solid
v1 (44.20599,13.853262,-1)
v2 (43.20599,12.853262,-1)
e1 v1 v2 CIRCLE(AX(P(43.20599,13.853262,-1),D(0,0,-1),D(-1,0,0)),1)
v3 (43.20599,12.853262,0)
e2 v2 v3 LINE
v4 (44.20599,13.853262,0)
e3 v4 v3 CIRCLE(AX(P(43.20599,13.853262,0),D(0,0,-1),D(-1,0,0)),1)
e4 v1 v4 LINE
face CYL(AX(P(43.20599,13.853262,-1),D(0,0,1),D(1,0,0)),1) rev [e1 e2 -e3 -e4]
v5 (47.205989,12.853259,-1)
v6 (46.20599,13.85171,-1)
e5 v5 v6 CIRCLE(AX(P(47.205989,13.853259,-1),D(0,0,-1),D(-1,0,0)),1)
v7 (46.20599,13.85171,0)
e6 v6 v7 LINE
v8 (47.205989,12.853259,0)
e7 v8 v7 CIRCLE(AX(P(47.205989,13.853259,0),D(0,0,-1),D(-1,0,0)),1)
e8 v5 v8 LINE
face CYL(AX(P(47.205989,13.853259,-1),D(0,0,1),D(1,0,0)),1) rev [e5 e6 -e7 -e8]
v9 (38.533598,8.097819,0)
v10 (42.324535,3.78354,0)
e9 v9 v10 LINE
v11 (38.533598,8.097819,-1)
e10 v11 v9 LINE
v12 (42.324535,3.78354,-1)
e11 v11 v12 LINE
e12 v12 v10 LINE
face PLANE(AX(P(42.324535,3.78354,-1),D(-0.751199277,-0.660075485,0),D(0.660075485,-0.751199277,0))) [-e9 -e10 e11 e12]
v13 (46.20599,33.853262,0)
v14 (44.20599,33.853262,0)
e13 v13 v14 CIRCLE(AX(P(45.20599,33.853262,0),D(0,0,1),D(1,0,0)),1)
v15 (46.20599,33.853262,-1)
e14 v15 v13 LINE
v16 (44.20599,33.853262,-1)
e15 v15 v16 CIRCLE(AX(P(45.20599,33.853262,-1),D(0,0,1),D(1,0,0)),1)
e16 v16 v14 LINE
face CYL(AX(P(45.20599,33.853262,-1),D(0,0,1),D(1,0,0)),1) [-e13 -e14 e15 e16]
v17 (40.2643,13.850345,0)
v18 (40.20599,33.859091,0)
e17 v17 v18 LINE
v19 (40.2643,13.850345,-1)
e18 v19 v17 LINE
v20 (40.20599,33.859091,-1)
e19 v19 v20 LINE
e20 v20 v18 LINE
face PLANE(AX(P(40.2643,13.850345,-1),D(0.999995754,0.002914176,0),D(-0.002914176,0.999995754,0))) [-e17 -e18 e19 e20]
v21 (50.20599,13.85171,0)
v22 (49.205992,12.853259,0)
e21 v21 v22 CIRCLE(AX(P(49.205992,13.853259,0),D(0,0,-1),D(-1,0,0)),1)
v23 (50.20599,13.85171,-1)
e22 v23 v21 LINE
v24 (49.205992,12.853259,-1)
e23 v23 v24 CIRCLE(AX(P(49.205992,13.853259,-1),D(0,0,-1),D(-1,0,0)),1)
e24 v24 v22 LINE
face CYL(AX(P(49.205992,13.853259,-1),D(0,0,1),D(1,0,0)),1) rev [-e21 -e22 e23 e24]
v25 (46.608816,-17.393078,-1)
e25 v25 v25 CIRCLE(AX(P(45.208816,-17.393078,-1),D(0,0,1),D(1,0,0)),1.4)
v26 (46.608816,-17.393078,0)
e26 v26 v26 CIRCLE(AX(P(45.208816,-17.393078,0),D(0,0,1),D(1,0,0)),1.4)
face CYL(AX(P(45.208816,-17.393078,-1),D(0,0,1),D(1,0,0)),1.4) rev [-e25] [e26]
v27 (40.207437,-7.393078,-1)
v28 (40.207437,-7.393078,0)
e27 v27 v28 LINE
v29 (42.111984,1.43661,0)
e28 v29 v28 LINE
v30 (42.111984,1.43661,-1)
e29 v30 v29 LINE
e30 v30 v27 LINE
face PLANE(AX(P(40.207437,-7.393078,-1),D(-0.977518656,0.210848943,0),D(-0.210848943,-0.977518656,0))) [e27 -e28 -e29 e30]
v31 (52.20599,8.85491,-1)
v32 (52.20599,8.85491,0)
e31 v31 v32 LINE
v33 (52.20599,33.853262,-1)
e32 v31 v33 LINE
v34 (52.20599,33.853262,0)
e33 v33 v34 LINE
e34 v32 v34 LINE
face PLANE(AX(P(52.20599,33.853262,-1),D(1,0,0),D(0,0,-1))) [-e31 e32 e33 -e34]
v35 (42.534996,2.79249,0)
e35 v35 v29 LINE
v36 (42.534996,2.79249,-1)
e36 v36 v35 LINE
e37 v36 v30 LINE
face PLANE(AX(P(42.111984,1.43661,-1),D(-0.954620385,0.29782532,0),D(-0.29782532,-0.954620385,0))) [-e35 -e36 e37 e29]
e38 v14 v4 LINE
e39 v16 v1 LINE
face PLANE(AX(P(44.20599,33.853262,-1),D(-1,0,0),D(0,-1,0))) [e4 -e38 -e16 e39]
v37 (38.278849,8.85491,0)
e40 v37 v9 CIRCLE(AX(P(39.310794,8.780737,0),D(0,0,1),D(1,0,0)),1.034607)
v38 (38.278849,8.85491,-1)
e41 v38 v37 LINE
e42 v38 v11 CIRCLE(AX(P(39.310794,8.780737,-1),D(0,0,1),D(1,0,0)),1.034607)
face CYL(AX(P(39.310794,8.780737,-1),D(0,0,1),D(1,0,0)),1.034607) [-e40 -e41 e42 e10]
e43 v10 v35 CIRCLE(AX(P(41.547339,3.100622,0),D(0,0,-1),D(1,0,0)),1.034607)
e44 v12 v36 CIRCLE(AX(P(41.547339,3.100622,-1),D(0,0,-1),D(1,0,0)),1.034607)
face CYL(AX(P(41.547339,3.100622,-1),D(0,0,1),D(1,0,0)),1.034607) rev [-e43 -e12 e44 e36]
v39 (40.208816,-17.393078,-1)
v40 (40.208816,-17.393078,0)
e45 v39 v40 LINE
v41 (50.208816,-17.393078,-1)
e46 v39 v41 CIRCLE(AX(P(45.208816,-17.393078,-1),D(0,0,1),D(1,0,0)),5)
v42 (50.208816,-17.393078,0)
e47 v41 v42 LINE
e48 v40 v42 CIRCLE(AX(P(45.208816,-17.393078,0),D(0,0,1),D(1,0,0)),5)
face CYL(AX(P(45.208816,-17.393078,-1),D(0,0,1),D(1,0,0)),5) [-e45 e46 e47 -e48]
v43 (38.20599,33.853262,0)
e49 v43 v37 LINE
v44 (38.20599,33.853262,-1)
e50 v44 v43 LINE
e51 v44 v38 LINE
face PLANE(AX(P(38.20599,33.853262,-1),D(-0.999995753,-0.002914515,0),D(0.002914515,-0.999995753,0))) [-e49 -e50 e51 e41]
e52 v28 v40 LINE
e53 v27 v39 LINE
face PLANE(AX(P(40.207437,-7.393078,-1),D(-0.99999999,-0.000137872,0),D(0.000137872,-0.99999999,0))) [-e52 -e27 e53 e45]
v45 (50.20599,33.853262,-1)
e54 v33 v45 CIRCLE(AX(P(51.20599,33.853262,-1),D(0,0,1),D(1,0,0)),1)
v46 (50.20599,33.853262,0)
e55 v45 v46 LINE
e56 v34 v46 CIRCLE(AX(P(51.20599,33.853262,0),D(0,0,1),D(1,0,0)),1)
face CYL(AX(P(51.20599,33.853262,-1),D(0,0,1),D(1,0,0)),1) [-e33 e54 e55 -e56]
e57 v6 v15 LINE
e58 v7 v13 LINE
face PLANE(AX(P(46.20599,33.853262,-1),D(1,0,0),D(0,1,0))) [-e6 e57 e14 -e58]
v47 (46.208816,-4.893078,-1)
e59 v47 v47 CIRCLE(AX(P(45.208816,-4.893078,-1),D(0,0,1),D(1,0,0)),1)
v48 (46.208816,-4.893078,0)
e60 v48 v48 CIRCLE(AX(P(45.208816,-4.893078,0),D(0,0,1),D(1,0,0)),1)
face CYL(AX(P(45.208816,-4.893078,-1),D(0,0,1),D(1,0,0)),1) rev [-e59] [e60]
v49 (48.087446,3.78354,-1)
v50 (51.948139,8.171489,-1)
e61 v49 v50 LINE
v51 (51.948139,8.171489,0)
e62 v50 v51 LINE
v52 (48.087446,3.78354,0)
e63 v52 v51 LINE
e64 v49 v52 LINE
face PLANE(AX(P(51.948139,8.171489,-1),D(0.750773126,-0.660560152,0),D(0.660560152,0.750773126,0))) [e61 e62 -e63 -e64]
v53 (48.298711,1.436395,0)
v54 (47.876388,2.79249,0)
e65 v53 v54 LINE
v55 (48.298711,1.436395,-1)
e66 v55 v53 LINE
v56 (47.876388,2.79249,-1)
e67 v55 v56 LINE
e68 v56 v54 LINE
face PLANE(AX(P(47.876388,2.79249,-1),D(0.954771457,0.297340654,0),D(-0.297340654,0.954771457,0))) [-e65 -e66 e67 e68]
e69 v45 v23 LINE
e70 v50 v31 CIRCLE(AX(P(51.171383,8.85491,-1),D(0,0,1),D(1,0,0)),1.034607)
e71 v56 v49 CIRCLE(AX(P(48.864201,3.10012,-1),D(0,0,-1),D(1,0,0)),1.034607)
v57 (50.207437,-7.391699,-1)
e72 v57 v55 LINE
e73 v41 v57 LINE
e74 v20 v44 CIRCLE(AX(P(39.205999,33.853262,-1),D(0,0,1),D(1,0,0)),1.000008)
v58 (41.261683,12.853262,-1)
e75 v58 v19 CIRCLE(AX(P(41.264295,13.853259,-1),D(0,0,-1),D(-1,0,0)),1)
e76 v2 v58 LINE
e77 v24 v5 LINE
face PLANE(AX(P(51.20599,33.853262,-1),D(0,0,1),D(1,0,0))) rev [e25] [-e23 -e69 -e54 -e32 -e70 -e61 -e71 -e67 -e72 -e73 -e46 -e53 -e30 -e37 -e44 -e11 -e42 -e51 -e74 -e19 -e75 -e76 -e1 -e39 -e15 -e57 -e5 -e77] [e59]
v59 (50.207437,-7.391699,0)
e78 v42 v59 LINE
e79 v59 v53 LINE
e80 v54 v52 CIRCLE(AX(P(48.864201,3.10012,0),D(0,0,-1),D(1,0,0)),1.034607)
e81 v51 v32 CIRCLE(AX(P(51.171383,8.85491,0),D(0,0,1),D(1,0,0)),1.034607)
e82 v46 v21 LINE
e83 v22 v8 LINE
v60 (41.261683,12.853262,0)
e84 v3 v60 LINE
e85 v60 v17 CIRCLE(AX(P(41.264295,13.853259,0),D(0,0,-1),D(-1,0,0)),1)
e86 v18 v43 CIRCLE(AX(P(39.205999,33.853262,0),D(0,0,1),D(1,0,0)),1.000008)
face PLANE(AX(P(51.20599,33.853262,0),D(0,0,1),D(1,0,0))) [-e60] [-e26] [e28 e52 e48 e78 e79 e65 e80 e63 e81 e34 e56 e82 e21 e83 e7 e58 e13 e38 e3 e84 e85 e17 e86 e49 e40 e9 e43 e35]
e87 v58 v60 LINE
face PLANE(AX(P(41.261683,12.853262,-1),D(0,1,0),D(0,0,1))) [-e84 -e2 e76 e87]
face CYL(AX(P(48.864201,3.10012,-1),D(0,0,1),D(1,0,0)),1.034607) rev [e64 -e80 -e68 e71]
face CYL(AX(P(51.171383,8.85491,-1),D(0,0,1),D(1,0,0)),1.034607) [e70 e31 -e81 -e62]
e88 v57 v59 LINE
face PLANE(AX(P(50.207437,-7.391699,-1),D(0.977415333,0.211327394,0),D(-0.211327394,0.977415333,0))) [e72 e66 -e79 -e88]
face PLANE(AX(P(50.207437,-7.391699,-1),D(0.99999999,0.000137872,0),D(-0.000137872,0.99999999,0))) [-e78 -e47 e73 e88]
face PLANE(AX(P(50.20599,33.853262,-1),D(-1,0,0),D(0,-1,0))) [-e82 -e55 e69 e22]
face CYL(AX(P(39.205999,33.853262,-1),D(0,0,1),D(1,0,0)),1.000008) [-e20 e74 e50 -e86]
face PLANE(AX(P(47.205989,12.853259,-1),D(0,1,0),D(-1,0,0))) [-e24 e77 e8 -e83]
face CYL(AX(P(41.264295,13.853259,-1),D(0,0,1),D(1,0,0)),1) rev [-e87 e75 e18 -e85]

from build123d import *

# Parameters (mm, degrees)
MODEL_R           = 1.4
MODEL_R_2         = 1
BRIDA_BASE1_DEPTH = 1


# Sheet-metal steps are written as plain solids
with BuildPart() as part:
    # Model → Brida base1 (new body)
    with BuildSketch(Plane.XY):
        with BuildLine():
            Line((50.207437074, -7.391699149), (48.298711017, 1.436394934))
            Line((48.298711017, 1.436394934), (47.876387864, 2.792489658))
            ThreePointArc((47.876387864, 2.792489658), (47.852286656, 3.315621633), (48.087445951, 3.783540469))
            Line((48.087445951, 3.783540469), (51.948138549, 8.171489457))
            ThreePointArc((51.948138549, 8.171489457), (52.139383389, 8.489686819), (52.2059904, 8.854909567))
            Line((52.2059904, 8.854909567), (52.2059904, 33.853262145))
            ThreePointArc((52.2059904, 33.853262145), (51.2059904, 34.853262145), (50.2059904, 33.853262145))
            Line((50.2059904, 33.853262145), (50.2059904, 13.851710132))
            ThreePointArc((50.2059904, 13.851710132), (49.912550656, 13.14560465), (49.205991599, 12.853258732))
            Line((49.205991599, 12.853258732), (47.205989201, 12.853258732))
            ThreePointArc((47.205989201, 12.853258732), (46.499430144, 13.14560465), (46.2059904, 13.851710132))
            Line((46.2059904, 13.851710132), (46.2059904, 33.853262145))
            ThreePointArc((46.2059904, 33.853262145), (45.2059904, 34.853262145), (44.2059904, 33.853262145))
            Line((44.2059904, 33.853262145), (44.2059904, 13.853262145))
            ThreePointArc((44.2059904, 13.853262145), (43.913097181, 13.146155364), (43.2059904, 12.853262145))
            Line((43.2059904, 12.853262145), (41.261682565, 12.853262145))
            ThreePointArc((41.261682565, 12.853262145), (40.55729517, 13.146045419), (40.26429965, 13.850344556))
            Line((40.26429965, 13.850344556), (40.2059904, 33.859090521))
            ThreePointArc((40.2059904, 33.859090521), (39.203084692, 34.853266391), (38.2059904, 33.853262145))
            Line((38.2059904, 33.853262145), (38.278848795, 8.854909567))
            ThreePointArc((38.278848795, 8.854909567), (38.330209967, 8.450786945), (38.53359758, 8.097818756))
            Line((38.53359758, 8.097818756), (42.324534849, 3.783540469))
            ThreePointArc((42.324534849, 3.783540469), (42.559377318, 3.315539648), (42.534995737, 2.792489658))
            Line((42.534995737, 2.792489658), (42.111984195, 1.436609508))
            Line((42.111984195, 1.436609508), (40.20743717, -7.393077864))
            Line((40.20743717, -7.393077864), (40.208815885, -17.393077769))
            ThreePointArc((40.208815885, -17.393077769), (45.208815932, -22.393077817), (50.20881598, -17.393077769))
            Line((50.20881598, -17.393077769), (50.207437074, -7.391699149))
        make_face()
        with Locations((45.208815932, -17.393077769)):
            Circle(MODEL_R, mode=Mode.SUBTRACT)
        with Locations((45.208815932, -4.893077769)):
            Circle(MODEL_R_2, mode=Mode.SUBTRACT)
    extrude(amount=-BRIDA_BASE1_DEPTH)


solid = part.part
